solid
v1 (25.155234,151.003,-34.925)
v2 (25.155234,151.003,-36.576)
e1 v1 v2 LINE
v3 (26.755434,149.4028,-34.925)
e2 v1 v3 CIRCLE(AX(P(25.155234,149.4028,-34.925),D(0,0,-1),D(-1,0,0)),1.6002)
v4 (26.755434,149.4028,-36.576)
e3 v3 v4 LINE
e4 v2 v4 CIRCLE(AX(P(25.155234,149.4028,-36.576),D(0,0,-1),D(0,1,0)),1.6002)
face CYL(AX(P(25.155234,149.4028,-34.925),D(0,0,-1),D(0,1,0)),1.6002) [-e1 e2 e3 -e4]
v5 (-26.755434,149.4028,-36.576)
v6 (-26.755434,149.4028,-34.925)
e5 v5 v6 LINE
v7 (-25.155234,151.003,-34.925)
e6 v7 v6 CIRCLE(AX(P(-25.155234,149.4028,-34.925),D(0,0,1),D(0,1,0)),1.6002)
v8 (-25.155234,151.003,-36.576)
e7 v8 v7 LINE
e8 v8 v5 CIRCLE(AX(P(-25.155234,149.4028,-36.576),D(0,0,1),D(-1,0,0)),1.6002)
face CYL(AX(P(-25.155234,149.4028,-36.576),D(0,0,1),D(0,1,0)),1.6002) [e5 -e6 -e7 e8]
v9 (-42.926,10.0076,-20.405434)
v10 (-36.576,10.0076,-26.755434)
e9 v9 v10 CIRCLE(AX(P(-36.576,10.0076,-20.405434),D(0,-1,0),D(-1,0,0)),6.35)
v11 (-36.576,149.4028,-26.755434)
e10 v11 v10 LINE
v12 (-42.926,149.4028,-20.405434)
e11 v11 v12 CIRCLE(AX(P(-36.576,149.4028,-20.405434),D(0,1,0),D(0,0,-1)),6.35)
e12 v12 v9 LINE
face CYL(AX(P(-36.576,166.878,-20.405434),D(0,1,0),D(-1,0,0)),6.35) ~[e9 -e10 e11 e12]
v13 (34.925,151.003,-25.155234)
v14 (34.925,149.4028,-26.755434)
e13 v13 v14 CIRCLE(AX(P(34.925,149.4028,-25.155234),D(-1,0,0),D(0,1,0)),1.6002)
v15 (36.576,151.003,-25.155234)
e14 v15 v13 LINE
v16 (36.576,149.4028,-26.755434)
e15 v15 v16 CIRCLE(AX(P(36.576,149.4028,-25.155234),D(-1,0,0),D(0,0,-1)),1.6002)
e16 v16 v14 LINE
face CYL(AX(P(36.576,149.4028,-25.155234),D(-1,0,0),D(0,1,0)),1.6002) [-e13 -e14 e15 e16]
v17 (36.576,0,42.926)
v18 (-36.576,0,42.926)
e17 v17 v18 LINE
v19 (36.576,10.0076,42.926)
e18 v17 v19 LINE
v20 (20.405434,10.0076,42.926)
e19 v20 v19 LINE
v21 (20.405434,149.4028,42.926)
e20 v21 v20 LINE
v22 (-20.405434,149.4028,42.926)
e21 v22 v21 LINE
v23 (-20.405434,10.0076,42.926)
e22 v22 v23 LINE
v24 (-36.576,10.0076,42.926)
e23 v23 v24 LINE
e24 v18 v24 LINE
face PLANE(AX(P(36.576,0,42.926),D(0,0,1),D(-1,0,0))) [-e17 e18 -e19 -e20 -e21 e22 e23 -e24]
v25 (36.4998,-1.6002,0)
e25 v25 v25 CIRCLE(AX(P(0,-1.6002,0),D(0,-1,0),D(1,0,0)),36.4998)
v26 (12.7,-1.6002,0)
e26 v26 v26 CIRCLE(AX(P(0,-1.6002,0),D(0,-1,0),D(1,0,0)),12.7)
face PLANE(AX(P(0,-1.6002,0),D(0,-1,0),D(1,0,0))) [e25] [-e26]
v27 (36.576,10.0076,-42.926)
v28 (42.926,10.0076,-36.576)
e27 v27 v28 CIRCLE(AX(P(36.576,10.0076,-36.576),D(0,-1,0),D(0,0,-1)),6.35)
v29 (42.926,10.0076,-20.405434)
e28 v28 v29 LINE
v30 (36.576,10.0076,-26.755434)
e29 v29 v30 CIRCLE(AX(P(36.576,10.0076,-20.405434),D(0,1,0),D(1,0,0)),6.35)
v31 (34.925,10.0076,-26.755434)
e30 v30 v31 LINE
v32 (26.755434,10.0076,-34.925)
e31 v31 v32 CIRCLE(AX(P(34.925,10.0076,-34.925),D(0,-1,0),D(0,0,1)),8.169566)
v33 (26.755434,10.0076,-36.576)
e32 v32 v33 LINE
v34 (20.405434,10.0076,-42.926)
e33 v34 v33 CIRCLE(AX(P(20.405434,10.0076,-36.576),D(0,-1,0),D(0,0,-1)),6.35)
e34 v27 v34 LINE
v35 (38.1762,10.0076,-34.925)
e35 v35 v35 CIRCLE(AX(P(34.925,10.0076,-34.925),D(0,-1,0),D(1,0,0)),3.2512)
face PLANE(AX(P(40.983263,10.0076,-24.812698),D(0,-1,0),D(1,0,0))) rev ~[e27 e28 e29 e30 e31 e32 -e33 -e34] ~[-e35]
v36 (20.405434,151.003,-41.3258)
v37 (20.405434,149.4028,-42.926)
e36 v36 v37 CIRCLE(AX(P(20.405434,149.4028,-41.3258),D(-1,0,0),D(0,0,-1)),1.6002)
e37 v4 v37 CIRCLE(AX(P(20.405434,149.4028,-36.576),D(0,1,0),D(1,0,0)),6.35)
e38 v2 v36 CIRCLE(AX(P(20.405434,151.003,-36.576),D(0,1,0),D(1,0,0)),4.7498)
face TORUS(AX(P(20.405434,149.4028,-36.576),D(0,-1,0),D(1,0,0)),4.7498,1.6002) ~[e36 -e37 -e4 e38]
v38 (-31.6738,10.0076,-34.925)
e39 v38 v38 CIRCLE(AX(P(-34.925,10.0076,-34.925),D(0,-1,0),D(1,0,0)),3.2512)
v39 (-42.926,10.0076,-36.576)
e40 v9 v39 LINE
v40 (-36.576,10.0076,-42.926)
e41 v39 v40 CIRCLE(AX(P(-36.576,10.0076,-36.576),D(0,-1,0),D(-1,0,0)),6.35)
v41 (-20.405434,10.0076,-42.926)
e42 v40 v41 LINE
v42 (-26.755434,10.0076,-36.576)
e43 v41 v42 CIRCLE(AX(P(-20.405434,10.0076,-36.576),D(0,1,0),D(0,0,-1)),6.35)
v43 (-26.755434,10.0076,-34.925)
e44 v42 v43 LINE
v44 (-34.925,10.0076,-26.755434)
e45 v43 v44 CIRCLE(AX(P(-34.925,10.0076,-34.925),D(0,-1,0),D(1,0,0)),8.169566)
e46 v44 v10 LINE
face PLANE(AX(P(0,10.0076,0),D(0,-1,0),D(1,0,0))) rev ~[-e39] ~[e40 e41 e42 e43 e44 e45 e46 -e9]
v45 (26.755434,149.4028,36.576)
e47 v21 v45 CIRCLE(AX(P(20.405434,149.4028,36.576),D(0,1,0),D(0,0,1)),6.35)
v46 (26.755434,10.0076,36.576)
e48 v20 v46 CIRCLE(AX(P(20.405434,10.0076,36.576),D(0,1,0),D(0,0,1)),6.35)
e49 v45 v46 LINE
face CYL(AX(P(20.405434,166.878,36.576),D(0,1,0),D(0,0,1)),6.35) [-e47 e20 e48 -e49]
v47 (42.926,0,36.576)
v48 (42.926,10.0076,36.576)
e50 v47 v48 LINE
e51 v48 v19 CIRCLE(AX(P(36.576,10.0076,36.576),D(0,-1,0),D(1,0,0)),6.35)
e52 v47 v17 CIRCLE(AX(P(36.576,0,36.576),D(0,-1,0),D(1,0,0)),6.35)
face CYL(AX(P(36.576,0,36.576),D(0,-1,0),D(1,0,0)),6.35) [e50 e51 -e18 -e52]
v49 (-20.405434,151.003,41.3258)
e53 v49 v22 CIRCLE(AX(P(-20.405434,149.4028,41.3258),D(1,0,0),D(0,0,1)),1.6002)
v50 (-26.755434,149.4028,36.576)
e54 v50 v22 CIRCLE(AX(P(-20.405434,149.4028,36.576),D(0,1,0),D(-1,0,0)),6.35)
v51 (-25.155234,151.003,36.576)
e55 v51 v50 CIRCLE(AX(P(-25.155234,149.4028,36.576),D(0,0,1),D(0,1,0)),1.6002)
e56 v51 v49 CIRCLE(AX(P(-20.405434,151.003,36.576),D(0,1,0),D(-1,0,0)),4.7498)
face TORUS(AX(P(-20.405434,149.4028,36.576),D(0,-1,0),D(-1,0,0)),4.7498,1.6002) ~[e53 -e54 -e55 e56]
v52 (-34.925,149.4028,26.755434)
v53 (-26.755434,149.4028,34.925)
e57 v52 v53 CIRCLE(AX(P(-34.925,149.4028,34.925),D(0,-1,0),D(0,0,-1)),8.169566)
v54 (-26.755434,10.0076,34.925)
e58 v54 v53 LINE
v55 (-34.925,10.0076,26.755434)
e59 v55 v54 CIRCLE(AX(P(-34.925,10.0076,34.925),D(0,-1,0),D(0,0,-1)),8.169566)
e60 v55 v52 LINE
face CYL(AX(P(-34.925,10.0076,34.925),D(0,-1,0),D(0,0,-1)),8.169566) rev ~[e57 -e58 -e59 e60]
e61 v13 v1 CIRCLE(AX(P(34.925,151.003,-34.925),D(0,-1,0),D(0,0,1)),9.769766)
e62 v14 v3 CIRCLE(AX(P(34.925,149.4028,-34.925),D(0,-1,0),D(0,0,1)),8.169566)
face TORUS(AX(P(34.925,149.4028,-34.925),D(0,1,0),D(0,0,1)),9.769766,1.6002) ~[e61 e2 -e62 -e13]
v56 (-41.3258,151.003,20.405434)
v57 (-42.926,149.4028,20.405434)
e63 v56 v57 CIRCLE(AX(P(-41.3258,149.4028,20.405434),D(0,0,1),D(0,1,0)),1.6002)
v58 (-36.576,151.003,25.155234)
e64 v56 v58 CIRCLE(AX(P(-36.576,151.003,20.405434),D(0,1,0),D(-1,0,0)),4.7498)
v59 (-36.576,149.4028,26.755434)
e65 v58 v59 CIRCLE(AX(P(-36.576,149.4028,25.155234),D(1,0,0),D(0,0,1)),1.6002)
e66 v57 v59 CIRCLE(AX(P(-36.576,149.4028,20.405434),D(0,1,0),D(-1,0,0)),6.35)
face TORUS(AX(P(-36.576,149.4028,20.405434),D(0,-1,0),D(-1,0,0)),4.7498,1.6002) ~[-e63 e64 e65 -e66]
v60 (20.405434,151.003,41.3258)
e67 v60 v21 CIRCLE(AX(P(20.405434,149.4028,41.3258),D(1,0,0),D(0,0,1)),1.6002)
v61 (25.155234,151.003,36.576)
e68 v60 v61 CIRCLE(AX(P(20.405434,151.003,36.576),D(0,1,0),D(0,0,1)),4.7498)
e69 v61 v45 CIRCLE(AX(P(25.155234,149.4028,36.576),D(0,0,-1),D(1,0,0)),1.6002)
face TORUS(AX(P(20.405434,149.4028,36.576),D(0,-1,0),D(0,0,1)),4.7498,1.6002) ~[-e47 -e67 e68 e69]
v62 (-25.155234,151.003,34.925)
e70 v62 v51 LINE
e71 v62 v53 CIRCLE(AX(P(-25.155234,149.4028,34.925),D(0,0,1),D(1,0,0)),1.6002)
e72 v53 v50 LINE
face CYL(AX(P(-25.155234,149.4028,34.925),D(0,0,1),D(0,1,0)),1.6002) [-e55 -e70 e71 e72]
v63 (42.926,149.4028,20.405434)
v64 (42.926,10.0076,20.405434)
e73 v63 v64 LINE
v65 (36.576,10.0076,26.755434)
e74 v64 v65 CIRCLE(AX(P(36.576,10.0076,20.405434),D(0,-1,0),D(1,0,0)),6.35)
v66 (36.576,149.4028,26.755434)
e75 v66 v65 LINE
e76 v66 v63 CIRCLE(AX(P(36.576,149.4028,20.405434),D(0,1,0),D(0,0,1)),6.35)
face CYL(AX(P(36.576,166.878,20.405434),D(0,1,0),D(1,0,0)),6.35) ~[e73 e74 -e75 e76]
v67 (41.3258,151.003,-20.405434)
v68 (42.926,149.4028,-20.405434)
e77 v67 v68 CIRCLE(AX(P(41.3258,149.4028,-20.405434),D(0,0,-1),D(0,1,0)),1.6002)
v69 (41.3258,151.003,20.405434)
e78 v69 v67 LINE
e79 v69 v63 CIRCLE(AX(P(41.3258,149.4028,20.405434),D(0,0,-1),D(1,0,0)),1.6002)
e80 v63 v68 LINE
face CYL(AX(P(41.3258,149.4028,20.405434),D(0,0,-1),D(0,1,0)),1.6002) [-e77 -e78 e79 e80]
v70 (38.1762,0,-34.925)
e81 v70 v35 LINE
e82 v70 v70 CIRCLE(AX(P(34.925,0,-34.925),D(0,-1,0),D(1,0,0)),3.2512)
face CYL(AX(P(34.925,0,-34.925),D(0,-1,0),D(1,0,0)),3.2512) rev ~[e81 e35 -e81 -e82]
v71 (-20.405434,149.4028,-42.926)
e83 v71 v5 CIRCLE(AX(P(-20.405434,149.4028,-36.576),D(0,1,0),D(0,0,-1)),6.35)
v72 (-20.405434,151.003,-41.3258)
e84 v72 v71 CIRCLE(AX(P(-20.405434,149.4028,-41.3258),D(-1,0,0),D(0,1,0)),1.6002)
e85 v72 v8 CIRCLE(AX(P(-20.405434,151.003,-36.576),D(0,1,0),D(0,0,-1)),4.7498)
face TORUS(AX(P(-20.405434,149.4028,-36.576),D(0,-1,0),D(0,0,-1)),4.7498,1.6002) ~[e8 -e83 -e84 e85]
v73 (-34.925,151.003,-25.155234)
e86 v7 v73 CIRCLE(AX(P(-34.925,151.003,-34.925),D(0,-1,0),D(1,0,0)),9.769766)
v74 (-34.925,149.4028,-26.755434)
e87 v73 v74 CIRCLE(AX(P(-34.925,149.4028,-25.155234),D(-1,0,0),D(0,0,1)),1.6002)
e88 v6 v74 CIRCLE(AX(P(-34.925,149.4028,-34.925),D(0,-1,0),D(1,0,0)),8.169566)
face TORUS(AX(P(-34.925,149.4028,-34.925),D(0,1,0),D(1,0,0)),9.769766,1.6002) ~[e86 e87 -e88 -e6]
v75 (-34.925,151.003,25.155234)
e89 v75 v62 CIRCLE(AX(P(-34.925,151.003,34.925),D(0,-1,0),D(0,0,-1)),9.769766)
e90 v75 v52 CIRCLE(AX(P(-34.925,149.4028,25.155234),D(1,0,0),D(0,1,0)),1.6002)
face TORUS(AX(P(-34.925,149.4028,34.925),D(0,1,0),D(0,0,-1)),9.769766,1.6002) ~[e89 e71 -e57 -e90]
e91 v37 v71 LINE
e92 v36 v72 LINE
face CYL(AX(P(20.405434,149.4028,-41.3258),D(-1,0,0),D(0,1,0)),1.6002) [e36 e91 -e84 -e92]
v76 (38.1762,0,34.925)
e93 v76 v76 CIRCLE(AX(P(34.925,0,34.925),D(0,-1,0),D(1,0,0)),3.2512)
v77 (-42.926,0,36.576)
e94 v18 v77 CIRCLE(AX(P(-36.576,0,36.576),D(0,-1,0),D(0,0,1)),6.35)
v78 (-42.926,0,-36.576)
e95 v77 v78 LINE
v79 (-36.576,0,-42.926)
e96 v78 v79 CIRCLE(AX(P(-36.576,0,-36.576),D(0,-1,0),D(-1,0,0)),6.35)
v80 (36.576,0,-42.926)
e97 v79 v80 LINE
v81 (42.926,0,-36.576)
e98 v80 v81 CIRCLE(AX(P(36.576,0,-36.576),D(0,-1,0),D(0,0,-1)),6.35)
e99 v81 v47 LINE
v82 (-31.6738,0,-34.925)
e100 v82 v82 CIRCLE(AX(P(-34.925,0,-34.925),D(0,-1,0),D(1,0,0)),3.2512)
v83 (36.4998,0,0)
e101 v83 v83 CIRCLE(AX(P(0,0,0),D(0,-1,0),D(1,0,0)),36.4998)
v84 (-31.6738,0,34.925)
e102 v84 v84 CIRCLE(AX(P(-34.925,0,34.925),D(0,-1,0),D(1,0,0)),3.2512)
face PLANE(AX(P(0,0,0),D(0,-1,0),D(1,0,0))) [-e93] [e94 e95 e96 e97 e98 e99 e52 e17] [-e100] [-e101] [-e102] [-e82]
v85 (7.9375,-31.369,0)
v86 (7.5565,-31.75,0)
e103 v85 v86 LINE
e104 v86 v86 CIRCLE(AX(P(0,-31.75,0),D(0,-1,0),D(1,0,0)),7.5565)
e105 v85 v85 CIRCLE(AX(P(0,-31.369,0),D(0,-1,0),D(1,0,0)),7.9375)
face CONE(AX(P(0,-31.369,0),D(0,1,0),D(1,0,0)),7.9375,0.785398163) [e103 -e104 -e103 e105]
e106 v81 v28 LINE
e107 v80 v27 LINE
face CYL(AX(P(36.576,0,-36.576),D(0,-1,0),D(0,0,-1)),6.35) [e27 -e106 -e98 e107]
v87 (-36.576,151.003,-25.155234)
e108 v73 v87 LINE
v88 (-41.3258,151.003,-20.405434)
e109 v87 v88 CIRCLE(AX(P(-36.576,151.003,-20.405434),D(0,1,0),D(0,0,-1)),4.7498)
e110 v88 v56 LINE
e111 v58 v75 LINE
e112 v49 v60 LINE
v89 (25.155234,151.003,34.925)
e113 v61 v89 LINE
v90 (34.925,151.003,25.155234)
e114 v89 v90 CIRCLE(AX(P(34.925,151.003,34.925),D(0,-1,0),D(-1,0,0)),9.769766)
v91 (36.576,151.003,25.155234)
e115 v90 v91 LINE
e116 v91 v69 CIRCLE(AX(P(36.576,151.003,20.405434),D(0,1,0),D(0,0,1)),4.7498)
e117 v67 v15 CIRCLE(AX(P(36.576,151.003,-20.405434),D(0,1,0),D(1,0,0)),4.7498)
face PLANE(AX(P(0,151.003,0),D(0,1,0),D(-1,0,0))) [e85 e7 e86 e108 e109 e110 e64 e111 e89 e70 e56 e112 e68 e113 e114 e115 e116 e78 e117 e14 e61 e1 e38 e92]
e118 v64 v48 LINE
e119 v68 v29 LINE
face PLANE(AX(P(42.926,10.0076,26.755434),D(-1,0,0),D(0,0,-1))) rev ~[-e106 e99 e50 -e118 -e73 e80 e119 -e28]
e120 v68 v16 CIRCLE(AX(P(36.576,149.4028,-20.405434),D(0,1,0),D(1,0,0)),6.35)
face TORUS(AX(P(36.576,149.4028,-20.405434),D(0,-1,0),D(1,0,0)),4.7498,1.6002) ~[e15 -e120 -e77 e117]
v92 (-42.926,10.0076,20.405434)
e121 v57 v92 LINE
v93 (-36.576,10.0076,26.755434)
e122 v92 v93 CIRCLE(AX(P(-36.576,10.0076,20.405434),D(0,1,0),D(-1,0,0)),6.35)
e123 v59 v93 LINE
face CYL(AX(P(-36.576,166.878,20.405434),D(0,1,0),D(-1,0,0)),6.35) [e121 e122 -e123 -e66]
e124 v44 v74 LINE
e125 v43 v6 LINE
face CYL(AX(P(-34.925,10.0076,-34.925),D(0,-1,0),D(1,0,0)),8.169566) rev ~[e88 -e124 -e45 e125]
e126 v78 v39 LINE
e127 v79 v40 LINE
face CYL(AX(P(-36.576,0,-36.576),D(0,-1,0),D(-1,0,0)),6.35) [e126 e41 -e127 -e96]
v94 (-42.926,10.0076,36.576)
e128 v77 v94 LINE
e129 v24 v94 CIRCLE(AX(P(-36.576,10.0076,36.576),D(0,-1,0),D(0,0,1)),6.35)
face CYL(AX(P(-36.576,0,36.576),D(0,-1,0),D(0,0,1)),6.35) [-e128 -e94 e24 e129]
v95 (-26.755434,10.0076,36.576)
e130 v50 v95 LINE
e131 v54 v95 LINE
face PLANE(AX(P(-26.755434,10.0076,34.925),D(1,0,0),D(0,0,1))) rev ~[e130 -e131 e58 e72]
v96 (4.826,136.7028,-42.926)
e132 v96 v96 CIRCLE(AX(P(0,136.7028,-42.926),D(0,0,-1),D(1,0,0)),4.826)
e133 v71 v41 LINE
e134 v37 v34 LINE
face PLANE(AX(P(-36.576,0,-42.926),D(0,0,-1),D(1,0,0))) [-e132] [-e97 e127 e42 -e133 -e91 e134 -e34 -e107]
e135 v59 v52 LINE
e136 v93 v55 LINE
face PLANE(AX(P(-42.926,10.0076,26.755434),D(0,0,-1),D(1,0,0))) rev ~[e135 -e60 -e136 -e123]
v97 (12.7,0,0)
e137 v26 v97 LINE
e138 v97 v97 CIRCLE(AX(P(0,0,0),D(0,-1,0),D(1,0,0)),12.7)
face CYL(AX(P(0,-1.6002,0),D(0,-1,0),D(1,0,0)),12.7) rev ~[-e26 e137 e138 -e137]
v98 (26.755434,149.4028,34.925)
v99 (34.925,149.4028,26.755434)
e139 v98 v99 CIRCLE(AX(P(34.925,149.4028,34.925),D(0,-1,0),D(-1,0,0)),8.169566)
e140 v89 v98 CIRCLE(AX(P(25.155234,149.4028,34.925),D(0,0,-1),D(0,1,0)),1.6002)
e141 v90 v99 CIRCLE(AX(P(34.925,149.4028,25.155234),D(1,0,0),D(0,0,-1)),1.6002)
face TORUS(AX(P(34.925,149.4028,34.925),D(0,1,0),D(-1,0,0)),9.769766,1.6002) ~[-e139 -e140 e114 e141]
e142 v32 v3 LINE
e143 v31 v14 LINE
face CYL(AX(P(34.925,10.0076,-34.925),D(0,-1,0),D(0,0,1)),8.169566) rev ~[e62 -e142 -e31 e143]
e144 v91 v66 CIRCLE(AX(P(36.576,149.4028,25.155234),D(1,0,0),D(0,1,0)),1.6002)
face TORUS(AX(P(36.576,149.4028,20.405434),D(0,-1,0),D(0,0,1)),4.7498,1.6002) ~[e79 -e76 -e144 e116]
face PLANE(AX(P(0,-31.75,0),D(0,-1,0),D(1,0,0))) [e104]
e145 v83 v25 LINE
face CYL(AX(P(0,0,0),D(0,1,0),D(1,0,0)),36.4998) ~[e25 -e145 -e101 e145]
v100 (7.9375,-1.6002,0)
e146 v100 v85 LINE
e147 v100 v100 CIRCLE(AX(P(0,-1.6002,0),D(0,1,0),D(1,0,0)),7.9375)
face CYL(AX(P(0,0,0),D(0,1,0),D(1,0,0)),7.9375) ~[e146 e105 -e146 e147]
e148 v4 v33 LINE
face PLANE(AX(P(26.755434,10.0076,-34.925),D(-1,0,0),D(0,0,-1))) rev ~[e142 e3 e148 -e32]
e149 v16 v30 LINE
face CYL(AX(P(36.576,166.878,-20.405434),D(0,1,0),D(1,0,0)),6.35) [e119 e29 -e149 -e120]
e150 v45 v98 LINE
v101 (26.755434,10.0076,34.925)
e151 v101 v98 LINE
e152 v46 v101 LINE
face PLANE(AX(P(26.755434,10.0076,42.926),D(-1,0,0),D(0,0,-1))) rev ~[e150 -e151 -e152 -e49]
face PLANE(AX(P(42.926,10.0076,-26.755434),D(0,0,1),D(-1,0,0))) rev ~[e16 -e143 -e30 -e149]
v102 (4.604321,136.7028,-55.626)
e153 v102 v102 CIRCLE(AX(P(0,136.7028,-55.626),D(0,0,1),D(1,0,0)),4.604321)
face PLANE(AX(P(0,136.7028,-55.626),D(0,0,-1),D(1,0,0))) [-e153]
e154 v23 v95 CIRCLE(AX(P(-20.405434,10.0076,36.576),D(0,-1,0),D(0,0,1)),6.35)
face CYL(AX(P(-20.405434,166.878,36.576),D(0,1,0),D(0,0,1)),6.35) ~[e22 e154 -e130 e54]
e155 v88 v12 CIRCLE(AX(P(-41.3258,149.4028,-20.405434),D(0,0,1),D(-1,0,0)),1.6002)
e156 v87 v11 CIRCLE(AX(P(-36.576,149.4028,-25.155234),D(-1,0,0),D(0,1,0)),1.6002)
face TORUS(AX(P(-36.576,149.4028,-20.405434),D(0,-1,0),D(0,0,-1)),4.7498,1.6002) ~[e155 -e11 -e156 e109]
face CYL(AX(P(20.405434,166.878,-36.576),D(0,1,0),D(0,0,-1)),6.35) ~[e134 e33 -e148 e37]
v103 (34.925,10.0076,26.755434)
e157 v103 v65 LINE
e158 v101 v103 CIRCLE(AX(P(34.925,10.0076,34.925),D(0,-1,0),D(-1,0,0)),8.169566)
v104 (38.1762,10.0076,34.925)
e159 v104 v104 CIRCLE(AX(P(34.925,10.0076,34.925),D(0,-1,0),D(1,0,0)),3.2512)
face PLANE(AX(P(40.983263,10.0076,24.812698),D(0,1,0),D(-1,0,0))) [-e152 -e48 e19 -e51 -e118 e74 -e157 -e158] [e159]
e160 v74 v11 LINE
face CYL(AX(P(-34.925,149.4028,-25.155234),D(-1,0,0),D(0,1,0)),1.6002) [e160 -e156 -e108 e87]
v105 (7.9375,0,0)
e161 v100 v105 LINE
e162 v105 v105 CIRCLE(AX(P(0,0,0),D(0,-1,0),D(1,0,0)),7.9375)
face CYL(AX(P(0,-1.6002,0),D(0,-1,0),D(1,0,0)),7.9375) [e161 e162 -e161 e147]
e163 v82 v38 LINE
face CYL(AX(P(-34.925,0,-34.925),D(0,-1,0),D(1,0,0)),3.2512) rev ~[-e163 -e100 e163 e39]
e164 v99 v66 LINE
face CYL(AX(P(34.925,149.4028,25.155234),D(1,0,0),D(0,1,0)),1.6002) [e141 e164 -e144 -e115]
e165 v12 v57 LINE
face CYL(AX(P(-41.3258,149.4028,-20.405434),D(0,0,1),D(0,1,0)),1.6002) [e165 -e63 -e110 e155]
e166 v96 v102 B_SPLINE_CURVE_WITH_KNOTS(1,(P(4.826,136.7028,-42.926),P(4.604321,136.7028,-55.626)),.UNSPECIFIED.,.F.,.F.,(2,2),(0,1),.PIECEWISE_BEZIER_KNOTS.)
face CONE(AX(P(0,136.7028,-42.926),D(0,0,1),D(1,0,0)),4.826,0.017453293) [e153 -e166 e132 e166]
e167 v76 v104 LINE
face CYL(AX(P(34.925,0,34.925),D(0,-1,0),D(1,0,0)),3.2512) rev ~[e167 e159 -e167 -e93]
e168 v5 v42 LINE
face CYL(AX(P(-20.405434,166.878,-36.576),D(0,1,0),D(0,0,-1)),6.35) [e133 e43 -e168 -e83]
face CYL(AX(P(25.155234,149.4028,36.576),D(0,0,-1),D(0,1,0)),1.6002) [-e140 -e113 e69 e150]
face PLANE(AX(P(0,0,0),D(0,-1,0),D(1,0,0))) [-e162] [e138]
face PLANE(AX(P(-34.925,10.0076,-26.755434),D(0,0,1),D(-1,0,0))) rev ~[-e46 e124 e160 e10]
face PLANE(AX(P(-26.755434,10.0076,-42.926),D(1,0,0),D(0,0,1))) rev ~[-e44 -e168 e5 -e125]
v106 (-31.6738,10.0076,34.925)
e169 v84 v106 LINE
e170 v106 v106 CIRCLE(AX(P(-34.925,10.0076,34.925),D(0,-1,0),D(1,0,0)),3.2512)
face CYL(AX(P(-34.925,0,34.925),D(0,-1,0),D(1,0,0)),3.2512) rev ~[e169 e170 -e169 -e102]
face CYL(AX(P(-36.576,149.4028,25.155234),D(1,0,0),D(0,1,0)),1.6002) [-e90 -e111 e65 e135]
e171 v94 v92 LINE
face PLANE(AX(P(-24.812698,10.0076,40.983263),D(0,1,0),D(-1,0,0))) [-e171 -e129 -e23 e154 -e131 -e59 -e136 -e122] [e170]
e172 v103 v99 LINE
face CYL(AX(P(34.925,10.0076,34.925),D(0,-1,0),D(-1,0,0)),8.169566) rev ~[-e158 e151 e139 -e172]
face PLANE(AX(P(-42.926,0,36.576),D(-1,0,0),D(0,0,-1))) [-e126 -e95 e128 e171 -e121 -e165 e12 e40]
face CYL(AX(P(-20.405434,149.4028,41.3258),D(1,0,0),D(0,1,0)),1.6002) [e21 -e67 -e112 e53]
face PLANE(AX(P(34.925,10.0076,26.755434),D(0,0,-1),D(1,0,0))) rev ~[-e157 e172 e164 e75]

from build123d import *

# Parameters (mm, degrees)
F0_R         = 3.2512
F1_DEPTH     = 10.0076
F2_R         = 36.4998
F3_DEPTH     = 1.6002
F4_R         = 7.9375
F5_DEPTH     = 31.75
F6_SIZE      = 0.381
F7_R         = 12.7
F7_R_2       = 7.9375
F8_DEPTH     = 1.6002
F10_DEPTH    = 140.9954
F11_T1_DEPTH = 156.8704
F12_R        = 1.6002
F13_R        = 4.826
F14_DEPTH    = 12.7
F14_TAPER    = 1


# Not quite as in the source:
# - a fillet or chamfer that OpenCascade refuses, or shapes differently, is made with other operations: its cross-section is extruded or revolved along the edge and cut away or added


with BuildPart() as f1:
    # F0 (on Front) → F1 (new body)
    with BuildSketch(Plane.XZ):
        with BuildLine():
            ThreePointArc((42.926, 36.576), (41.0661280605, 41.0661280605), (36.576, 42.926))
            Line((36.576, 42.926), (-36.576, 42.926))
            ThreePointArc((-36.576, 42.926), (-41.0661280605, 41.0661280605), (-42.926, 36.576))
            Line((-42.926, 36.576), (-42.926, -36.576))
            ThreePointArc((-42.926, -36.576), (-41.0661280605, -41.0661280605), (-36.576, -42.926))
            Line((-36.576, -42.926), (36.576, -42.926))
            ThreePointArc((36.576, -42.926), (41.0661280605, -41.0661280605), (42.926, -36.576))
            Line((42.926, -36.576), (42.926, 36.576))
        make_face()
        with Locations((-34.925, -34.925)):
            Circle(F0_R, mode=Mode.SUBTRACT)
        with Locations((34.925, -34.925)):
            Circle(F0_R, mode=Mode.SUBTRACT)
        with Locations((-34.925, 34.925)):
            Circle(F0_R, mode=Mode.SUBTRACT)
        with Locations((34.925, 34.925)):
            Circle(F0_R, mode=Mode.SUBTRACT)
    extrude(amount=-F1_DEPTH)

    # F2 (on Front) → F3 (join)
    with BuildSketch(Plane.XZ):
        Circle(F2_R)
    extrude(amount=F3_DEPTH)

    # F4 (on Front) → F5 (join)
    with BuildSketch(Plane.XZ):
        Circle(F4_R)
    extrude(amount=F5_DEPTH)

    # F6
    f6_edges = [f1.edges().sort_by_distance(p)[0] for p in [
        (-7.9375, -31.75, 0),
    ]]
    chamfer(f6_edges, length=F6_SIZE)

    # F7 (on face) → F8 (cut)
    with BuildSketch(Plane.XZ.offset(1.6002)):
        Circle(F7_R)
        Circle(F7_R_2, mode=Mode.SUBTRACT)
    extrude(amount=-F8_DEPTH, mode=Mode.SUBTRACT)

    # F9 (on face) → F10 (join)
    with BuildSketch(Plane(origin=(0, 10.0076, 0), x_dir=(-1, 0, 0), z_dir=(0, 1, 0))):
        with BuildLine():
            ThreePointArc((-26.7554344057, 34.925), (-29.1482447689, 29.1482447689), (-34.925, 26.7554344057))
            Line((-34.925, 26.7554344057), (-42.926, 26.7554344057))
            Line((-42.926, 26.7554344057), (-42.926, -26.7554344057))
            Line((-42.926, -26.7554344057), (-34.925, -26.7554344057))
            ThreePointArc((-34.925, -26.7554344057), (-29.1482447689, -29.1482447689), (-26.7554344057, -34.925))
            Line((-26.7554344057, -34.925), (-26.7554344057, -42.926))
            Line((-26.7554344057, -42.926), (26.7554344057, -42.926))
            Line((26.7554344057, -42.926), (26.7554344057, -34.925))
            ThreePointArc((26.7554344057, -34.925), (29.1482447689, -29.1482447689), (34.925, -26.7554344057))
            Line((34.925, -26.7554344057), (42.926, -26.7554344057))
            Line((42.926, -26.7554344057), (42.926, 26.7554344057))
            Line((42.926, 26.7554344057), (34.925, 26.7554344057))
            ThreePointArc((34.925, 26.7554344057), (29.1482447689, 29.1482447689), (26.7554344057, 34.925))
            Line((26.7554344057, 34.925), (26.7554344057, 42.926))
            Line((26.7554344057, 42.926), (-26.7554344057, 42.926))
            Line((-26.7554344057, 42.926), (-26.7554344057, 34.925))
        make_face()
    extrude(amount=F10_DEPTH)

    # F11: fillet of radius 6.35 on 8 edges, made by hand

    # F11_s2 → F11_t1 (cut)
    with BuildSketch(Plane.XZ.offset(-166.878)):
        with BuildLine():
            ThreePointArc((20.4054344057, 42.926), (24.8955624662, 41.0661280605), (26.7554344057, 36.576))
            Line((26.7554344057, 36.576), (26.7554344057, 42.926))
            Line((26.7554344057, 42.926), (20.4054344057, 42.926))
        make_face()
        with BuildLine():
            ThreePointArc((42.926, 20.4054344057), (41.0661280605, 24.8955624662), (36.576, 26.7554344057))
            Line((36.576, 26.7554344057), (42.926, 26.7554344057))
            Line((42.926, 26.7554344057), (42.926, 20.4054344057))
        make_face()
        with BuildLine():
            ThreePointArc((42.926, -20.4054344057), (41.0661280605, -24.8955624662), (36.576, -26.7554344057))
            Line((36.576, -26.7554344057), (42.926, -26.7554344057))
            Line((42.926, -26.7554344057), (42.926, -20.4054344057))
        make_face()
        with BuildLine():
            ThreePointArc((20.4054344057, -42.926), (24.8955624662, -41.0661280605), (26.7554344057, -36.576))
            Line((26.7554344057, -36.576), (26.7554344057, -42.926))
            Line((26.7554344057, -42.926), (20.4054344057, -42.926))
        make_face()
        with BuildLine():
            ThreePointArc((-20.4054344057, 42.926), (-24.8955624662, 41.0661280605), (-26.7554344057, 36.576))
            Line((-26.7554344057, 36.576), (-26.7554344057, 42.926))
            Line((-26.7554344057, 42.926), (-20.4054344057, 42.926))
        make_face()
        with BuildLine():
            ThreePointArc((-42.926, 20.4054344057), (-41.0661280605, 24.8955624662), (-36.576, 26.7554344057))
            Line((-36.576, 26.7554344057), (-42.926, 26.7554344057))
            Line((-42.926, 26.7554344057), (-42.926, 20.4054344057))
        make_face()
        with BuildLine():
            ThreePointArc((-42.926, -20.4054344057), (-41.0661280605, -24.8955624662), (-36.576, -26.7554344057))
            Line((-36.576, -26.7554344057), (-42.926, -26.7554344057))
            Line((-42.926, -26.7554344057), (-42.926, -20.4054344057))
        make_face()
        with BuildLine():
            ThreePointArc((-20.4054344057, -42.926), (-24.8955624662, -41.0661280605), (-26.7554344057, -36.576))
            Line((-26.7554344057, -36.576), (-26.7554344057, -42.926))
            Line((-26.7554344057, -42.926), (-20.4054344057, -42.926))
        make_face()
    extrude(amount=F11_T1_DEPTH, mode=Mode.SUBTRACT)

    # F12
    f12_edges = [f1.edges().sort_by_distance(p)[0] for p in [
        (24.895562, 151.003, 41.066128),
    ]]
    fillet(f12_edges, radius=F12_R)

    # F13 (on face) → F14 (join)
    with BuildSketch(Plane(origin=(0, 0, -42.926), x_dir=(1, 0, 0), z_dir=(0, 0, -1))):
        with Locations((0, -136.7028)):
            Circle(F13_R)
    extrude(amount=F14_DEPTH, taper=F14_TAPER)


solid = f1.part
